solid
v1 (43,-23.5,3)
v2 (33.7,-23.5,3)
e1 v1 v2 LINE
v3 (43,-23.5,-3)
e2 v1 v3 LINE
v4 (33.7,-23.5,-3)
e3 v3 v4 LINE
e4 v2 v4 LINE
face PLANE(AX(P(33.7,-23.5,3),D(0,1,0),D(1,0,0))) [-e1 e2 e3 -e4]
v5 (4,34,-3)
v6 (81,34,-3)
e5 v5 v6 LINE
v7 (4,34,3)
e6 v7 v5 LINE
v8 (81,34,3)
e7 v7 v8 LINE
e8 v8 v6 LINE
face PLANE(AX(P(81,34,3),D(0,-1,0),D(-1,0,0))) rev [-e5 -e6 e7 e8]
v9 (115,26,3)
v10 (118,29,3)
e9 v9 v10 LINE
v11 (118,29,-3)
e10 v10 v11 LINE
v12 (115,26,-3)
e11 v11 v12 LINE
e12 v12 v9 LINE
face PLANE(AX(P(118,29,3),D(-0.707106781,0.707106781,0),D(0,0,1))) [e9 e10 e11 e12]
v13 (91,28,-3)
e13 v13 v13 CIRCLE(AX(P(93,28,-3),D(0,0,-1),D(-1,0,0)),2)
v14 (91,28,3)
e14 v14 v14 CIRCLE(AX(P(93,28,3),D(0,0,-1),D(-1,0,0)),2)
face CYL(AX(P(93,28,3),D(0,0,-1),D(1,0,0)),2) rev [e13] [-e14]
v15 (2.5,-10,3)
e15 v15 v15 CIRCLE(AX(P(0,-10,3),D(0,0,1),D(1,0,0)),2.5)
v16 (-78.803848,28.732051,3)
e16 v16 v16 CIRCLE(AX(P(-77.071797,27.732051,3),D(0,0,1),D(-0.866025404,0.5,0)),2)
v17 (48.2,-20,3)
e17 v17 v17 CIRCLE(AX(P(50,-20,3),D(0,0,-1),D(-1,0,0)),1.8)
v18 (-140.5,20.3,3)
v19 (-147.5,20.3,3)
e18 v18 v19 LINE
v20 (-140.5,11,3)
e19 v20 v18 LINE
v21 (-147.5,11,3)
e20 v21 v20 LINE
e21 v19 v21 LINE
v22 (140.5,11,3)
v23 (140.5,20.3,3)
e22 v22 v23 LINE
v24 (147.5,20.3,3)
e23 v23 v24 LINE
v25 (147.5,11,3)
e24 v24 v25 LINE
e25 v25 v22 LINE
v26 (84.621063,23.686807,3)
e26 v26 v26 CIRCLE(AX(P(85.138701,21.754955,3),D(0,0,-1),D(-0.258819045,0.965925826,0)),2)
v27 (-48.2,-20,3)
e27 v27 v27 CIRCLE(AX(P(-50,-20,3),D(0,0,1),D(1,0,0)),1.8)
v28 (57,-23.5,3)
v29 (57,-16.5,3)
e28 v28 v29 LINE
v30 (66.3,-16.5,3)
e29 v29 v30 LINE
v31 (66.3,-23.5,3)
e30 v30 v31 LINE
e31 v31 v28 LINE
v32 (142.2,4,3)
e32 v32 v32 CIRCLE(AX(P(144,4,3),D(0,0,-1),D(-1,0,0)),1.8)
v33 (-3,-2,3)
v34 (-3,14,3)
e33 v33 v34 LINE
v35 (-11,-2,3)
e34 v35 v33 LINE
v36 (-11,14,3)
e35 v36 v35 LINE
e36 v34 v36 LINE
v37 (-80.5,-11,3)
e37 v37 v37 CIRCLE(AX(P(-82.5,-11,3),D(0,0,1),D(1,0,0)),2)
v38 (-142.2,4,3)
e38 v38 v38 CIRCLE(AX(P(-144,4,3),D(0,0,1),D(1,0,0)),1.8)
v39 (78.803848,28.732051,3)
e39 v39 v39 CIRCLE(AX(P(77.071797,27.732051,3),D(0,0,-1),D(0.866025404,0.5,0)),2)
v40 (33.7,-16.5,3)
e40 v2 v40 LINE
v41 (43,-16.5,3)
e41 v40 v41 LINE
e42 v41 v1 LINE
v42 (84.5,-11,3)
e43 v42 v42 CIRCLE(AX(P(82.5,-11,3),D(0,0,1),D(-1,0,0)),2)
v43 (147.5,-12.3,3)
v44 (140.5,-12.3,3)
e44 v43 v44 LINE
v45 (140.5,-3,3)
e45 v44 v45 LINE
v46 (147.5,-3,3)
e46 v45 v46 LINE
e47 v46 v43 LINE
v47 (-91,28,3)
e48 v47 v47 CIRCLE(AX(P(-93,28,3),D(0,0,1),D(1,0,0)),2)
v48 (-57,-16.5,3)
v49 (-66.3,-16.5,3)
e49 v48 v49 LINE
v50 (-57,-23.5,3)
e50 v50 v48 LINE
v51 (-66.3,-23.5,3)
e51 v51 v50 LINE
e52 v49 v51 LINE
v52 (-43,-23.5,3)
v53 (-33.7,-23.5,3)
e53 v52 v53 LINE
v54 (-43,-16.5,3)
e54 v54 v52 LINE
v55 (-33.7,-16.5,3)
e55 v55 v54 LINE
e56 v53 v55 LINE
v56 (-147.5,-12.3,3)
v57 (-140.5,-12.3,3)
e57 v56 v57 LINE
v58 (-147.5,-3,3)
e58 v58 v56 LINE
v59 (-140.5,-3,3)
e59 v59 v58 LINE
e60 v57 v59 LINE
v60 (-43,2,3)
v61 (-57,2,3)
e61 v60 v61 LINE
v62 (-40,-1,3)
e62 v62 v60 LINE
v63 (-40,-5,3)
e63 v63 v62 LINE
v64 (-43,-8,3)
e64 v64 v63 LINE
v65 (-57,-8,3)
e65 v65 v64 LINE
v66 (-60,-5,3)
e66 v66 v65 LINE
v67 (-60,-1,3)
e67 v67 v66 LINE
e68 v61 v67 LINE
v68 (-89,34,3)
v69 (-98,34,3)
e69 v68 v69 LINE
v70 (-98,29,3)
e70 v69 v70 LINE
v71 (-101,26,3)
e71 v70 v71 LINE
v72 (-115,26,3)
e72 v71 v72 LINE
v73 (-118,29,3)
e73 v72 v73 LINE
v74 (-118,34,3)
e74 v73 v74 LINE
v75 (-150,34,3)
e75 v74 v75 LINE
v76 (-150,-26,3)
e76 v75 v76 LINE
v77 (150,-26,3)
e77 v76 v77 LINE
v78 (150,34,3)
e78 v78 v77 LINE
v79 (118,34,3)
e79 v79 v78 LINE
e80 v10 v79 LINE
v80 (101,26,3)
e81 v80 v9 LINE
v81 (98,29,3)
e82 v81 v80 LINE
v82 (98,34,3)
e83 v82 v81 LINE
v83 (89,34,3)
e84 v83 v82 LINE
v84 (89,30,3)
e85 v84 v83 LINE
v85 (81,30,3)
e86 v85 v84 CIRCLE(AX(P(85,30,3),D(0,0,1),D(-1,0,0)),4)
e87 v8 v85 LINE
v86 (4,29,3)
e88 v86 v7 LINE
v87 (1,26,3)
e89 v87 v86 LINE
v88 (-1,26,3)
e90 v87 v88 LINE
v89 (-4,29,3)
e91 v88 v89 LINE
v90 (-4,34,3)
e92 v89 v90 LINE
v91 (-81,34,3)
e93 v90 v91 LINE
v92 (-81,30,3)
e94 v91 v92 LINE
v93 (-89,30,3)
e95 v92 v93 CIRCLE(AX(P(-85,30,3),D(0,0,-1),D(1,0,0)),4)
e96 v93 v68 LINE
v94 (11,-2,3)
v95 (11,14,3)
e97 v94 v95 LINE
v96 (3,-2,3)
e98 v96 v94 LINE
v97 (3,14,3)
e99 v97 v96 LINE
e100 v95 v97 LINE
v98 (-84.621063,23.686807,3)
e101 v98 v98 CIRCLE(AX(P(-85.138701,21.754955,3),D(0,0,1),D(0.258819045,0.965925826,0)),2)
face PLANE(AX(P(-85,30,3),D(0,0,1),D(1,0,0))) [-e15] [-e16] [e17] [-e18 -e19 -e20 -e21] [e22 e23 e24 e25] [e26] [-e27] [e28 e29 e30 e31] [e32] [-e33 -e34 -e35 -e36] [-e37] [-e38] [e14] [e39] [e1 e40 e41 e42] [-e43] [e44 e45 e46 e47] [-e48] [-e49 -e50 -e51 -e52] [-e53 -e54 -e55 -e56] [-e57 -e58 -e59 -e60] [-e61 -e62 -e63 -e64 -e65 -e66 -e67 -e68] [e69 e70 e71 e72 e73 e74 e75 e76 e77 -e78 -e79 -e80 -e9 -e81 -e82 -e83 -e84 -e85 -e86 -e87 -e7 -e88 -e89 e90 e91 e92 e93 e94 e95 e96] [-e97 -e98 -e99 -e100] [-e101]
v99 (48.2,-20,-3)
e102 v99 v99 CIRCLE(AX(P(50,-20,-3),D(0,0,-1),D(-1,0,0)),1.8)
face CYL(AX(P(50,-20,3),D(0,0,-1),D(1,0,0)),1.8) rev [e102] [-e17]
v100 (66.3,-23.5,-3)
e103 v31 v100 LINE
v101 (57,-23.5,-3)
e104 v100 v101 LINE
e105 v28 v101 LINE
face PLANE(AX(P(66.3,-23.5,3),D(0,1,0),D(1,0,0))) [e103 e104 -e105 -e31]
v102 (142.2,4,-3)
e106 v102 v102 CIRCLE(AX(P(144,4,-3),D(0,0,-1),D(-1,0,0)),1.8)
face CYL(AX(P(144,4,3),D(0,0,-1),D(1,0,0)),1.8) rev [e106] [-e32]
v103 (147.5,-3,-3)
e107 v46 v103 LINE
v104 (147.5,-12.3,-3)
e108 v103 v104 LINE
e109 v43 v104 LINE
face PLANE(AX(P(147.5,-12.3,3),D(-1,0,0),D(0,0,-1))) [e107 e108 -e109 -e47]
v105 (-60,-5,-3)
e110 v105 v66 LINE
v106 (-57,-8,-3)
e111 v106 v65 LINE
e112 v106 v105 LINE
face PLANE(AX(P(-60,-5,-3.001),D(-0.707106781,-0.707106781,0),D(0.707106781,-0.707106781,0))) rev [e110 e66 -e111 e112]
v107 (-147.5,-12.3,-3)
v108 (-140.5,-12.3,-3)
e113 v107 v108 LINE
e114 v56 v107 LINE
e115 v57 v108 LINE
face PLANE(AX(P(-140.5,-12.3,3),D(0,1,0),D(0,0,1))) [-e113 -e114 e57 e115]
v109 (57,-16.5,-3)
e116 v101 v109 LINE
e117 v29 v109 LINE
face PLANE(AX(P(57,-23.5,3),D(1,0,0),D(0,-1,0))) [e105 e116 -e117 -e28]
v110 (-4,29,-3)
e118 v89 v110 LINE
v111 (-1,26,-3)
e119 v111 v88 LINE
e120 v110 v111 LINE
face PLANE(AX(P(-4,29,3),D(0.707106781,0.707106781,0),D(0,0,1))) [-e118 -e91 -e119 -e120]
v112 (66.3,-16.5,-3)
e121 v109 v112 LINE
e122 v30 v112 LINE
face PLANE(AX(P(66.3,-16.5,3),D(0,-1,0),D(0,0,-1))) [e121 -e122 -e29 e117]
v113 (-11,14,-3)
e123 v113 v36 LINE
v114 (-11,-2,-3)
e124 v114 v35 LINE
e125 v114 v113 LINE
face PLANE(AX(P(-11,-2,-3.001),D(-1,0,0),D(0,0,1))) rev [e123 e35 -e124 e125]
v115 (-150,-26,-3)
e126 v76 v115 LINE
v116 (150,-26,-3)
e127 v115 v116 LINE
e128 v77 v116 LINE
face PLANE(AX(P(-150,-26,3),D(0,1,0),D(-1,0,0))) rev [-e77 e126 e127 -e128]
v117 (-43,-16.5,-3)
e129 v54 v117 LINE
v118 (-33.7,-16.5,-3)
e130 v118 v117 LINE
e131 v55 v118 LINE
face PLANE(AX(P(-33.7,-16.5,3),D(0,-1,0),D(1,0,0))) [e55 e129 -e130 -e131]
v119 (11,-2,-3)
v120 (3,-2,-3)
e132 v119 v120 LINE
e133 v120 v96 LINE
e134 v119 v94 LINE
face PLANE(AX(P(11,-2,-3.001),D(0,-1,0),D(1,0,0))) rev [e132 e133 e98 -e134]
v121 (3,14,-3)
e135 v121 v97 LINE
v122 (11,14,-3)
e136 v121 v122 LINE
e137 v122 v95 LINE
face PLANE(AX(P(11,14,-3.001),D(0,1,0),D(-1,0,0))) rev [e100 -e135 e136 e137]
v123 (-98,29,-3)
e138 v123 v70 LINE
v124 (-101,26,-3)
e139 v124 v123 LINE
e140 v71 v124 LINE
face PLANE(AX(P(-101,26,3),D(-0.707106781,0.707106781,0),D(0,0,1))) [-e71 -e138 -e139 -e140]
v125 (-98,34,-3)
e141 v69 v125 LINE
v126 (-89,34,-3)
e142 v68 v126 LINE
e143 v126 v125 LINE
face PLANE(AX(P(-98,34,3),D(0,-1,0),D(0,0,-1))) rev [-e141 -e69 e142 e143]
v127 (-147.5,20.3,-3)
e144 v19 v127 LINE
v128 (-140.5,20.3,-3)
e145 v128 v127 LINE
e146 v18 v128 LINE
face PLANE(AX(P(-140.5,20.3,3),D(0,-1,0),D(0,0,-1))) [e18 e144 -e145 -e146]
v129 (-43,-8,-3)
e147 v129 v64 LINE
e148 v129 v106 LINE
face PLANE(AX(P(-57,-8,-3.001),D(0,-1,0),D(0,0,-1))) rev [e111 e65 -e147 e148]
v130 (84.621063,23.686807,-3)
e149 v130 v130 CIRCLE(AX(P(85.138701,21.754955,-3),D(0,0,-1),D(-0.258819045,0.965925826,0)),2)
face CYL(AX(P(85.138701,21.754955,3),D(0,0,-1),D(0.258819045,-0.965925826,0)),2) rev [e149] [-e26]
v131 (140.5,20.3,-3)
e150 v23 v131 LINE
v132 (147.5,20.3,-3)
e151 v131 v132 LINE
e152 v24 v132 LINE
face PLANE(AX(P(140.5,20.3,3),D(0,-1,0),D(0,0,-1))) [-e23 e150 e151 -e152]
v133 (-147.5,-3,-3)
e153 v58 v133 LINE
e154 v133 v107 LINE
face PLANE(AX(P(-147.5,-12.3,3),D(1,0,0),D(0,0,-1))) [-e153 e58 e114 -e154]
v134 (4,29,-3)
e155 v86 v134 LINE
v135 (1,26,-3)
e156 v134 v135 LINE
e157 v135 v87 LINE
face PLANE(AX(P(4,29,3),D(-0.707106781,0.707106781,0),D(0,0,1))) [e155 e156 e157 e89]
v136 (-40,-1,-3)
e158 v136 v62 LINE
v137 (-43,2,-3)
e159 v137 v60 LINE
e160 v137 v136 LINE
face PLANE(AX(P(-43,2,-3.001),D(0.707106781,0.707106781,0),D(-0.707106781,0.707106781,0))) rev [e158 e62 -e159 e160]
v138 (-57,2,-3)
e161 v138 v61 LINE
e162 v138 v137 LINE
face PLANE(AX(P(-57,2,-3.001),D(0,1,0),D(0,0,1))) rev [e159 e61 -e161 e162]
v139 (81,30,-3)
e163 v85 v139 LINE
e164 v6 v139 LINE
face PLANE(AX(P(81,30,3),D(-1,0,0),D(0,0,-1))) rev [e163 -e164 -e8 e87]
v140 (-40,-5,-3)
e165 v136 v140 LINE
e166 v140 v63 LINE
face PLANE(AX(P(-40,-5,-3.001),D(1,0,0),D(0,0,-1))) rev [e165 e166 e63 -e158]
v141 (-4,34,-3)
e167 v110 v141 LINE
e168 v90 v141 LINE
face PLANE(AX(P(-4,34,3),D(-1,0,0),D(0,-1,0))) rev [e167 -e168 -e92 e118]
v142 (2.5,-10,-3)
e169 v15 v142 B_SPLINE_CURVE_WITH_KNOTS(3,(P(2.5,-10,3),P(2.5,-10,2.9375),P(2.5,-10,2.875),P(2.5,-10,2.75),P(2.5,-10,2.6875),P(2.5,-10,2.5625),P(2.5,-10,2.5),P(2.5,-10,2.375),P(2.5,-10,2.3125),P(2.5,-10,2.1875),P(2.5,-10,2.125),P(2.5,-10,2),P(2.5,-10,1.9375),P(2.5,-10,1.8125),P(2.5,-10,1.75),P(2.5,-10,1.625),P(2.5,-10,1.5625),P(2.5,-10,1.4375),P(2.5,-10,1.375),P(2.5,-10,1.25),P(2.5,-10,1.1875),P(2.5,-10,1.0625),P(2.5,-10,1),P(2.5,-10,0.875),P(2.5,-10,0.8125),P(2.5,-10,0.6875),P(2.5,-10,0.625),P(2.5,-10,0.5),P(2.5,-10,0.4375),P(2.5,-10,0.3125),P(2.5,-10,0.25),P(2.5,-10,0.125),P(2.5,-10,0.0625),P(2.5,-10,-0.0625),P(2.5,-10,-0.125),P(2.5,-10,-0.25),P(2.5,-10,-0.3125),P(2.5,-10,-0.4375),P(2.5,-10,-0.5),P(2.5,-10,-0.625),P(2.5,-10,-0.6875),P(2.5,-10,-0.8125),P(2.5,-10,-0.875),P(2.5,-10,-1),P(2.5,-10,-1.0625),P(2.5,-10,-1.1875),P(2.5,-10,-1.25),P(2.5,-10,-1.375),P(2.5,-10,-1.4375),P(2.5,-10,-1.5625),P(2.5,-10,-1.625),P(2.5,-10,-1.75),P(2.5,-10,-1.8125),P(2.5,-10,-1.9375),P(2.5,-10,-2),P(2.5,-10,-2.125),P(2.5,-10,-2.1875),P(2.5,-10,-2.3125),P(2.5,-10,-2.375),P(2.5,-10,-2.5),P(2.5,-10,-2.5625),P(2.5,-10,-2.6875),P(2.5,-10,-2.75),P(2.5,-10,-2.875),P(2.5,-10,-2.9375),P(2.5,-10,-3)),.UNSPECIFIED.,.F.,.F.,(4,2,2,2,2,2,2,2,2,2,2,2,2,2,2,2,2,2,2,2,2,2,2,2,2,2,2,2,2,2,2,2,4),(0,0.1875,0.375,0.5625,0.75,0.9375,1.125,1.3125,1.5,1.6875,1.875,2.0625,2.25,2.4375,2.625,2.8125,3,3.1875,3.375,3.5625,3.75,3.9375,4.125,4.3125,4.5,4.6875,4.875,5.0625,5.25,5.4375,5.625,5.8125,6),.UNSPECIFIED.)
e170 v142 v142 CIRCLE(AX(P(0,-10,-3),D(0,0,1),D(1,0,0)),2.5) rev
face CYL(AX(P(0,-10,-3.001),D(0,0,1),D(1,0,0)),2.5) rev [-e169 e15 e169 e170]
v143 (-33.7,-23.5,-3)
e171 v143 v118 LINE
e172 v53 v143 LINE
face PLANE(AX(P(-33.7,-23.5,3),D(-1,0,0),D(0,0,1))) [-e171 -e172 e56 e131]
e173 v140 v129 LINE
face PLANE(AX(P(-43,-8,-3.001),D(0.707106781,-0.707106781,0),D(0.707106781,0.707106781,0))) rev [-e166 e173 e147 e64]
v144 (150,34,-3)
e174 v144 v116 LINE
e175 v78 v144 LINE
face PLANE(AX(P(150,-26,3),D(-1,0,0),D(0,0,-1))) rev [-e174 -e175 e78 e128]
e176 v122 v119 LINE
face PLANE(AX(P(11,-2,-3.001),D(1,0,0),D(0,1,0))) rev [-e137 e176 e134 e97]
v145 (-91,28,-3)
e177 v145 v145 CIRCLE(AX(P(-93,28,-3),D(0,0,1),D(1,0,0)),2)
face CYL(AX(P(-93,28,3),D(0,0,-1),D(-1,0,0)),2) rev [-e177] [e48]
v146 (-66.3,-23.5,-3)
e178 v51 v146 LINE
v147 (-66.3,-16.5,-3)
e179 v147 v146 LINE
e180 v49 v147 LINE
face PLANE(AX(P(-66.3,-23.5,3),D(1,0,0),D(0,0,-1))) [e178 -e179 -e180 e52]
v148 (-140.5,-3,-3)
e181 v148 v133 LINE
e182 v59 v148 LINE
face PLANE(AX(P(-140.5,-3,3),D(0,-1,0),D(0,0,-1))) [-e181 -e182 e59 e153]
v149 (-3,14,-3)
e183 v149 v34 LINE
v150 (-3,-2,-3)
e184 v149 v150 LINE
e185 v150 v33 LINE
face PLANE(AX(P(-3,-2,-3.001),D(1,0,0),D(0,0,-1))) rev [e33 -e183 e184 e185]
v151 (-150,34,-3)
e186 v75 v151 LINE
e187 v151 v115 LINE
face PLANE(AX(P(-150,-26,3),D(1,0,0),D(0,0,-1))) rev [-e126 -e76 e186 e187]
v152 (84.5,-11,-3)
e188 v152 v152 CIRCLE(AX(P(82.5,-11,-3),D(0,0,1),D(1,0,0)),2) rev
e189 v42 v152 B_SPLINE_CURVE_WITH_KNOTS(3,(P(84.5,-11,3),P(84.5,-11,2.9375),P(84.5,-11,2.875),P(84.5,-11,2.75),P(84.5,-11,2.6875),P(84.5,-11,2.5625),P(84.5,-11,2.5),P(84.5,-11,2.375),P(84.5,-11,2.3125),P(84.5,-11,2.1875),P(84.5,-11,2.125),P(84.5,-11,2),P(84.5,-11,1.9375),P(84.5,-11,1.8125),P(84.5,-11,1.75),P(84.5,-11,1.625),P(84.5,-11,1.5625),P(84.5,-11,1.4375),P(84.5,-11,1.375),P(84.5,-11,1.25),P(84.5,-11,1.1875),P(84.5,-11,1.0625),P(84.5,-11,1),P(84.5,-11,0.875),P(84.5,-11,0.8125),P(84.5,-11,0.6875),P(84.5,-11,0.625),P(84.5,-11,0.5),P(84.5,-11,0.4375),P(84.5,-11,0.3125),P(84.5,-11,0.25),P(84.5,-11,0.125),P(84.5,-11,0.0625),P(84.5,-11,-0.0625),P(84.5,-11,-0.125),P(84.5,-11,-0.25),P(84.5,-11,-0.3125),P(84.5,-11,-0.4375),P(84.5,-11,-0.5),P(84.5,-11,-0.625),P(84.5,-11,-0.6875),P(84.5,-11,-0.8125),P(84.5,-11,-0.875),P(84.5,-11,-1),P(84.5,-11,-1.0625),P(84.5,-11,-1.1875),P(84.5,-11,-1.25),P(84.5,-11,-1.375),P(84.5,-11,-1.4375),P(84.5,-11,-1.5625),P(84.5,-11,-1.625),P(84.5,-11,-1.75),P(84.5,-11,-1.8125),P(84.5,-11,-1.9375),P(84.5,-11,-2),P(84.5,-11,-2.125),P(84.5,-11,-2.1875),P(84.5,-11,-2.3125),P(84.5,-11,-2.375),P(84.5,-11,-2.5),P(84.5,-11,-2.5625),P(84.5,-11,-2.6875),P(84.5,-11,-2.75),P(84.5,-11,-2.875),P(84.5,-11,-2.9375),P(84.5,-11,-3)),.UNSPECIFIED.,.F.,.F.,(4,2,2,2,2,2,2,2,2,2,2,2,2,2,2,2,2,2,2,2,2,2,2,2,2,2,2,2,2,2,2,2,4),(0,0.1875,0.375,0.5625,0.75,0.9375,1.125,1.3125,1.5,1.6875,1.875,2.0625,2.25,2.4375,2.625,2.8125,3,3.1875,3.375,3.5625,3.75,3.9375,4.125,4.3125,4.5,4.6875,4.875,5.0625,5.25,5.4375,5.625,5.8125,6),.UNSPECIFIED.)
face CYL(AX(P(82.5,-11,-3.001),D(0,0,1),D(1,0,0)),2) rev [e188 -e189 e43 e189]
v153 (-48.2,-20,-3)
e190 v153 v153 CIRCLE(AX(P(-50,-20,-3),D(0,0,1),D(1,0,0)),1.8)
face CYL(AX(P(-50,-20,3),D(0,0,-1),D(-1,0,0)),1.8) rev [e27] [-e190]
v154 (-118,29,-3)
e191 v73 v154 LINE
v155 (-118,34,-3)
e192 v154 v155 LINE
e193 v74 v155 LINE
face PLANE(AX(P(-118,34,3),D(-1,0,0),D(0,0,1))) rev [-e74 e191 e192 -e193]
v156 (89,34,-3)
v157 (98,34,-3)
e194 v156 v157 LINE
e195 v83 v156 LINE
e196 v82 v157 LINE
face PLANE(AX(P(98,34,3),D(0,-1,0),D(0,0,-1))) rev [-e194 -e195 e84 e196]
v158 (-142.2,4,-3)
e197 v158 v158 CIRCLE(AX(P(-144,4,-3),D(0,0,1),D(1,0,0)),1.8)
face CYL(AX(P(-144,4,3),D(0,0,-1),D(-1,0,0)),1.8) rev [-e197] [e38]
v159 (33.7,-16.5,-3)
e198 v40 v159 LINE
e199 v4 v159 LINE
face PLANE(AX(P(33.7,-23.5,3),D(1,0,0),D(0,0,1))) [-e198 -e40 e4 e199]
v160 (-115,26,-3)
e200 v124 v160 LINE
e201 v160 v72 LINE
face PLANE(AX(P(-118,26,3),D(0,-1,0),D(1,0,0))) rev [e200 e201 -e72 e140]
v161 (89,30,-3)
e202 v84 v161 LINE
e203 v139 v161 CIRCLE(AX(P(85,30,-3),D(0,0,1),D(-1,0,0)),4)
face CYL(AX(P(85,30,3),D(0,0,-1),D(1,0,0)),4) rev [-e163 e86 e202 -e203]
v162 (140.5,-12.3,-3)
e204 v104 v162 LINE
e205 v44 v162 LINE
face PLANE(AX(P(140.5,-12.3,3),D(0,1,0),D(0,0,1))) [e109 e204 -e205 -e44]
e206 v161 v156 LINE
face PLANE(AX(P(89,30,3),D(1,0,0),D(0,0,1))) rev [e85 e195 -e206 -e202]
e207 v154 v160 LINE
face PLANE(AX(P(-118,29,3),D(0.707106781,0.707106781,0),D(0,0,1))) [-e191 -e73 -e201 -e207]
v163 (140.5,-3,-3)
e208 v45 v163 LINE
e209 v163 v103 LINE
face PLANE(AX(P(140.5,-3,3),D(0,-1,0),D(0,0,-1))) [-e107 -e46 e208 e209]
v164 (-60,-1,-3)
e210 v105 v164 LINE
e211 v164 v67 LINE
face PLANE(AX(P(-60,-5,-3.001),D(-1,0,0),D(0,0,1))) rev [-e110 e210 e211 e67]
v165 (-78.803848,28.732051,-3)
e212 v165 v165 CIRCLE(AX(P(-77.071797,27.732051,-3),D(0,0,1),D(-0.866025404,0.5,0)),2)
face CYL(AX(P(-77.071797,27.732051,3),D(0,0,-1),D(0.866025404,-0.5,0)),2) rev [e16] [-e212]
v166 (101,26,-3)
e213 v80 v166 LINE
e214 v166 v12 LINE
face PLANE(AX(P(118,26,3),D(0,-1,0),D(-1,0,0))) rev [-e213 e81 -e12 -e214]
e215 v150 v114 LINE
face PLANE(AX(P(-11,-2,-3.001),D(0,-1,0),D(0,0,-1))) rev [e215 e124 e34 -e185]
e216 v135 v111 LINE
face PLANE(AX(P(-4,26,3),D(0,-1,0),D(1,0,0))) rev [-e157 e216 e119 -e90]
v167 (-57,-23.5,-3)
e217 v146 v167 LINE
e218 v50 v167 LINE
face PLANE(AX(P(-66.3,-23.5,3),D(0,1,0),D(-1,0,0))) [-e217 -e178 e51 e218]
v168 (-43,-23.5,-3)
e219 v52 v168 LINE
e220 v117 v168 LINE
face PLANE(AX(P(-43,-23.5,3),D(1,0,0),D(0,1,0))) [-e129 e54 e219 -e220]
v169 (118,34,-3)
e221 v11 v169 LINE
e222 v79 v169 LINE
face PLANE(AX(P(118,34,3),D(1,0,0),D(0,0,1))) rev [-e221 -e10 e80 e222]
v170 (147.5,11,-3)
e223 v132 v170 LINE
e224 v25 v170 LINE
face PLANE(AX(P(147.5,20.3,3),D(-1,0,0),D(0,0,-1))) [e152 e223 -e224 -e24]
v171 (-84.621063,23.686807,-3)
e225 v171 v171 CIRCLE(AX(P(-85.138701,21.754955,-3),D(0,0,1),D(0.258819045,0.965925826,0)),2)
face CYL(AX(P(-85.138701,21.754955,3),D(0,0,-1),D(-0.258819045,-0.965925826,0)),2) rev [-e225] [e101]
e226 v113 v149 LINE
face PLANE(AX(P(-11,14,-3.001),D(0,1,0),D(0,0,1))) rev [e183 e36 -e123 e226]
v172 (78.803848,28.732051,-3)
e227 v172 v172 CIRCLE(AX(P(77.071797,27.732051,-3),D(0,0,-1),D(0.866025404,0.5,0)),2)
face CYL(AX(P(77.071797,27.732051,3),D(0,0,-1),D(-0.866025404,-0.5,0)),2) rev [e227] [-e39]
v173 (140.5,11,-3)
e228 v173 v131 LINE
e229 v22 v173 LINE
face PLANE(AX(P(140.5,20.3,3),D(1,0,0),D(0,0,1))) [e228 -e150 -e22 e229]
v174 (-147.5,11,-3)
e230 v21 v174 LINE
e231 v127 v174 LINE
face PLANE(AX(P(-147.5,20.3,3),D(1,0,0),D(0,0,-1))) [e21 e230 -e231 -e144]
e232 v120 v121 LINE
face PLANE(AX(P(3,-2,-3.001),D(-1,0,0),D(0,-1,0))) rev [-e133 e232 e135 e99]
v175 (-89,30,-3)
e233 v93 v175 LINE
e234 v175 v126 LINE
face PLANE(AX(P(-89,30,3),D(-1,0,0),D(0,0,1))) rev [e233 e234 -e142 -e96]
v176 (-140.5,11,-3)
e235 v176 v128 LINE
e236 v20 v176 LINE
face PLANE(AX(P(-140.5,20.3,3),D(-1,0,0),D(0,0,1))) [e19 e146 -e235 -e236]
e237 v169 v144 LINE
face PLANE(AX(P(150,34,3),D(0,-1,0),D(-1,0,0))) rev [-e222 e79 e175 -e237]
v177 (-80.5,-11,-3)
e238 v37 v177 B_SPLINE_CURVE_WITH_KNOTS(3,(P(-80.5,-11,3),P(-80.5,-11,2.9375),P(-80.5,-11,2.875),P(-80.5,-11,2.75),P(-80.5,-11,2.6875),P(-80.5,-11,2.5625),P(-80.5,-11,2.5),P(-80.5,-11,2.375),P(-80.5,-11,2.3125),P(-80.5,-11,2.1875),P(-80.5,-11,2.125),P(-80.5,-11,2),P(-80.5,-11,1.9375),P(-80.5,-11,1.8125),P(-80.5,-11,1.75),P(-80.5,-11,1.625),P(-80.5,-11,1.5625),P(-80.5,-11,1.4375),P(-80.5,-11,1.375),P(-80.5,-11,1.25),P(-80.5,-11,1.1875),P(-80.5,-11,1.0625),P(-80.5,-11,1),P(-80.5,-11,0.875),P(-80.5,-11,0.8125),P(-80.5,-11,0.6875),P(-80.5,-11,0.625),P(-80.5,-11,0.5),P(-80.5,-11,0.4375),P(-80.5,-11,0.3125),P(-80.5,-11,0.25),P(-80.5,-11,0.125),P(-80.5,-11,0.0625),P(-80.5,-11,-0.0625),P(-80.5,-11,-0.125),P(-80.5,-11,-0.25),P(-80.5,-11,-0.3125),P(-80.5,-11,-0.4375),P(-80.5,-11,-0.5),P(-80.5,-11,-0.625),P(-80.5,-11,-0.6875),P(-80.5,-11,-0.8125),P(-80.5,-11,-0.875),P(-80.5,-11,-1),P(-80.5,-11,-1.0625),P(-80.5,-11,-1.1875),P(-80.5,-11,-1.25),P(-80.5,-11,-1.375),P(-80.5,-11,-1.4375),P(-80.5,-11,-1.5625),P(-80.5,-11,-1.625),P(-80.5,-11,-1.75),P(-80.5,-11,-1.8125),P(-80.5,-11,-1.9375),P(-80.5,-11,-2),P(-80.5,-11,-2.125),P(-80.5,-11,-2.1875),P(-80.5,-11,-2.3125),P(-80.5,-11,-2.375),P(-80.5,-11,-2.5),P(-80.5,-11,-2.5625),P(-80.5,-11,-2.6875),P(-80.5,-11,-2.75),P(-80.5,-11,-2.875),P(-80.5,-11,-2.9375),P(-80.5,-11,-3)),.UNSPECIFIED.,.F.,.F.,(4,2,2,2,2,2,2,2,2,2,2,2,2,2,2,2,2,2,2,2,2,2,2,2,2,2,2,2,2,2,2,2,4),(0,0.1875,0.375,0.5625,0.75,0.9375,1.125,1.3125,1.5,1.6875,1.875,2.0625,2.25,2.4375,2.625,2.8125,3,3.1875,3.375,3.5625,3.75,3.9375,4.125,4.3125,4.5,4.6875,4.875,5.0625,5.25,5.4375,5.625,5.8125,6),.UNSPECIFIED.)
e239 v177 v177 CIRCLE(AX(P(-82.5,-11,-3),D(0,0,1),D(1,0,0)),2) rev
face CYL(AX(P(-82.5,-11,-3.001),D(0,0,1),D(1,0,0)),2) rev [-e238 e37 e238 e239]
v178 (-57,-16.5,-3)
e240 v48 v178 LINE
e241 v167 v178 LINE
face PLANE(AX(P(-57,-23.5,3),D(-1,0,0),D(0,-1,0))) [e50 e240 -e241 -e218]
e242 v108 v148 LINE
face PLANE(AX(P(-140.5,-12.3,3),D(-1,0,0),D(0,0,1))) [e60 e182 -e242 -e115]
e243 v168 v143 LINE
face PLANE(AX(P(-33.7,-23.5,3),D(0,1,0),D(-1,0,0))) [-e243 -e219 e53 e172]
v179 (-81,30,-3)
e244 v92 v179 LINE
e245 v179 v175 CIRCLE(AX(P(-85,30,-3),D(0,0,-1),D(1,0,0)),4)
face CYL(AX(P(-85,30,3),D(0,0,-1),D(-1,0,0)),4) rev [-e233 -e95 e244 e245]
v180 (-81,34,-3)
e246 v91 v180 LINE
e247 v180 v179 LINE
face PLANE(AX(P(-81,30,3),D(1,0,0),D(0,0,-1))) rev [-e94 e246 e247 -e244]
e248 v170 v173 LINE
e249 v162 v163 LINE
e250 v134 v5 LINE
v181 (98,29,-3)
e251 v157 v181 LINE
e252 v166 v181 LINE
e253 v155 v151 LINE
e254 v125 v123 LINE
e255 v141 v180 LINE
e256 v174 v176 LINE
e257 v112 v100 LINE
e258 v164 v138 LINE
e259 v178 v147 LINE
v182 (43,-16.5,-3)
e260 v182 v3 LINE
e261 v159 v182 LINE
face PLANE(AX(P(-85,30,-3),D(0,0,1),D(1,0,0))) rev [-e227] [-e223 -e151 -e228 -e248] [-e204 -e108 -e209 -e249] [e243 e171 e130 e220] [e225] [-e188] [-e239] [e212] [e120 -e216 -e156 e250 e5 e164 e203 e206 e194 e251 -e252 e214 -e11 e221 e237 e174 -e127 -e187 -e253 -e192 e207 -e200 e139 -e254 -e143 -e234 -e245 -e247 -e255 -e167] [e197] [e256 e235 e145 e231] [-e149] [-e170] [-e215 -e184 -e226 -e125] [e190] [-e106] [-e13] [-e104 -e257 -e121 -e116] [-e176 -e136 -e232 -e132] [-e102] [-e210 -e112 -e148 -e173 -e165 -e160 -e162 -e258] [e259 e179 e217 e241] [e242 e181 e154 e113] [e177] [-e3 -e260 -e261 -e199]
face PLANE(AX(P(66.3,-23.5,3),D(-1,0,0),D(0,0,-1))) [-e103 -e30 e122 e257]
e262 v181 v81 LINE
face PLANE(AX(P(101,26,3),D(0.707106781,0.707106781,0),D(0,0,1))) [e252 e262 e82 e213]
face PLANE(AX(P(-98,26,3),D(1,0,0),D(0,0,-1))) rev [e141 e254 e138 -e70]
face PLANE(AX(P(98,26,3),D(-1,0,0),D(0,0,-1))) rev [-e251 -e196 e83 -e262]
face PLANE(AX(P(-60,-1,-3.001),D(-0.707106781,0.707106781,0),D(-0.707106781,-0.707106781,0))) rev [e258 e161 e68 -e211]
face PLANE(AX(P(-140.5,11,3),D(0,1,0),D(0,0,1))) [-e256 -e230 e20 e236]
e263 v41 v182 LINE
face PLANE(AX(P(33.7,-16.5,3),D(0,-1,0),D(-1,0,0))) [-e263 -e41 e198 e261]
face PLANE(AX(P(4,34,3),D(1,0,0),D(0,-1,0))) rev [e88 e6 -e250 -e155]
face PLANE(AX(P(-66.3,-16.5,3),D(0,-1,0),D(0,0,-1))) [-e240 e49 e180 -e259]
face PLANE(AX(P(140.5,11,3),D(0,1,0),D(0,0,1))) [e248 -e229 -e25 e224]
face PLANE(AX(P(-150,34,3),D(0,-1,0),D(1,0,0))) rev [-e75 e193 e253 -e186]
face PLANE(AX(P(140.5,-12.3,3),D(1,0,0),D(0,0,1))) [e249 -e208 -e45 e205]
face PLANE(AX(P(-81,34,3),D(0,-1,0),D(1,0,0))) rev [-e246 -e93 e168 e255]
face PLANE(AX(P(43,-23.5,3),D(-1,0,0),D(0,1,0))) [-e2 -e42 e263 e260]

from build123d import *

# Parameters (mm, degrees)
ESQUISSE1_R                      = 2
ESQUISSE1_R_2                    = 1.8
ESQUISSE1_W                      = 7
ESQUISSE1_H                      = 9.3
ESQUISSE1_W_2                    = 9.3
ESQUISSE1_H_2                    = 7
BOSS_EXTRU_1_DEPTH               = 3
R_P_TITION_START                 = -3
R_P_TITION_CIRCULAIRE1_OUTLINE_R = 2
R_P_TITION_CIRCULAIRE1_DEPTH     = 6
CHANFREIN1_SIZE                  = 3
IDLER_REACH                      = 155.922
ESQUISSE2_R                      = 2.5
ESQUISSE2_W                      = 8
ESQUISSE2_H                      = 16
SCREEN_REACH                     = 155.922
ESQUISSE3_R                      = 2


# Read off the part's stored shape, not the designer's step: Répétition circulaire1
with BuildPart() as part:
    # Esquisse1 → Boss.-Extru.1 (new, symmetric)
    with BuildSketch(Plane.XY):
        with BuildLine():
            Line((-150, -26), (0, -26))
            Line((0, -26), (0, 26))
            Line((0, 26), (-4, 26))
            Line((-4, 26), (-4, 34))
            Line((-4, 34), (-81, 34))
            Line((-81, 34), (-81, 30))
            ThreePointArc((-81, 30), (-85, 26), (-89, 30))
            Line((-89, 30), (-89, 34))
            Line((-89, 34), (-98, 34))
            Line((-98, 34), (-98, 26))
            Line((-98, 26), (-118, 26))
            Line((-118, 26), (-118, 34))
            Line((-118, 34), (-150, 34))
            Line((-150, 34), (-150, -26))
        make_face()
        with Locations((-93, 28)):
            Circle(ESQUISSE1_R, mode=Mode.SUBTRACT)
        with Locations((-144, 4)):
            Circle(ESQUISSE1_R_2, mode=Mode.SUBTRACT)
        with Locations((-50, -20)):
            Circle(ESQUISSE1_R_2, mode=Mode.SUBTRACT)
        with Locations((-144, 15.65)):
            Rectangle(ESQUISSE1_W, ESQUISSE1_H, mode=Mode.SUBTRACT)
        with Locations((-144, -7.65)):
            Rectangle(ESQUISSE1_W, ESQUISSE1_H, mode=Mode.SUBTRACT)
        with Locations((-38.35, -20)):
            Rectangle(ESQUISSE1_W_2, ESQUISSE1_H_2, mode=Mode.SUBTRACT)
        with Locations((-61.65, -20)):
            Rectangle(ESQUISSE1_W_2, ESQUISSE1_H_2, mode=Mode.SUBTRACT)
    extrude(amount=BOSS_EXTRU_1_DEPTH, both=True)

    # Répétition circulaire1 outline → Répétition circulaire1 (cut)
    with BuildSketch(Plane.XY.offset(R_P_TITION_START)):
        with Locations((-77.07179677, 27.732050808)):
            Circle(R_P_TITION_CIRCULAIRE1_OUTLINE_R)
        with Locations((-85.138700708, 21.754955299)):
            Circle(R_P_TITION_CIRCULAIRE1_OUTLINE_R)
    extrude(amount=R_P_TITION_CIRCULAIRE1_DEPTH, mode=Mode.SUBTRACT)

    # Chanfrein1
    chanfrein1_edges = [part.edges().sort_by_distance(p)[0] for p in [
        (-118, 26, 0),
        (-98, 26, 0),
        (-4, 26, 0),
    ]]
    chamfer(chanfrein1_edges, length=CHANFREIN1_SIZE)

    # Symétrie2: part across plane


with BuildPart() as part_1:
    add(part.part)
    add(part.part.mirror(Plane(origin=(0, 26, 3), x_dir=(0, 0, 1), z_dir=(-1, 0, 0))))

    # Esquisse2 → idler (cut, up to next)
    with BuildSketch(Plane.XY.offset(3), mode=Mode.PRIVATE) as idler_sk1:
        with Locations((0, -10)):
            Circle(ESQUISSE2_R)
    idler_tool1 = extrude(idler_sk1.sketch, amount=-IDLER_REACH, mode=Mode.PRIVATE) & part_1.part
    # Esquisse2 → idler (cut, up to next)
    with BuildSketch(Plane.XY.offset(3), mode=Mode.PRIVATE) as idler_sk2:
        with Locations((-7, 6)):
            Rectangle(ESQUISSE2_W, ESQUISSE2_H)
    idler_tool2 = extrude(idler_sk2.sketch, amount=-IDLER_REACH, mode=Mode.PRIVATE) & part_1.part
    # Esquisse2 → idler (cut, up to next)
    with BuildSketch(Plane.XY.offset(3), mode=Mode.PRIVATE) as idler_sk3:
        with Locations((7, 6)):
            Rectangle(ESQUISSE2_W, ESQUISSE2_H)
    idler_tool3 = extrude(idler_sk3.sketch, amount=-IDLER_REACH, mode=Mode.PRIVATE) & part_1.part
    add(idler_tool1.solids().sort_by_distance((0, -10, 3))[0], mode=Mode.SUBTRACT)
    add(idler_tool2.solids().sort_by_distance((-7, 6, 3))[0], mode=Mode.SUBTRACT)
    add(idler_tool3.solids().sort_by_distance((7, 6, 3))[0], mode=Mode.SUBTRACT)

    # Esquisse3 → screen (cut, up to next)
    with BuildSketch(Plane.XY.offset(3), mode=Mode.PRIVATE) as screen_sk1:
        with Locations((-82.5, -11)):
            Circle(ESQUISSE3_R)
    screen_tool1 = extrude(screen_sk1.sketch, amount=-SCREEN_REACH, mode=Mode.PRIVATE) & part_1.part
    # Esquisse3 → screen (cut, up to next)
    with BuildSketch(Plane.XY.offset(3), mode=Mode.PRIVATE) as screen_sk2:
        with Locations((82.5, -11)):
            Circle(ESQUISSE3_R)
    screen_tool2 = extrude(screen_sk2.sketch, amount=-SCREEN_REACH, mode=Mode.PRIVATE) & part_1.part
    # Esquisse3 → screen (cut, up to next)
    with BuildSketch(Plane.XY.offset(3), mode=Mode.PRIVATE) as screen_sk3:
        Polygon((-59.999999802, -1), (-56.999999802, 2), (-42.999999802, 2), (-39.999999802, -1), (-39.999999802, -5), (-42.999999802, -8), (-56.999999802, -8), (-59.999999802, -5), align=None)
    screen_tool3 = extrude(screen_sk3.sketch, amount=-SCREEN_REACH, mode=Mode.PRIVATE) & part_1.part
    add(screen_tool1.solids().sort_by_distance((-82.5, -11, 3))[0], mode=Mode.SUBTRACT)
    add(screen_tool2.solids().sort_by_distance((82.5, -11, 3))[0], mode=Mode.SUBTRACT)
    add(screen_tool3.solids().sort_by_distance((-50, -3, 3))[0], mode=Mode.SUBTRACT)


solid = part_1.part
